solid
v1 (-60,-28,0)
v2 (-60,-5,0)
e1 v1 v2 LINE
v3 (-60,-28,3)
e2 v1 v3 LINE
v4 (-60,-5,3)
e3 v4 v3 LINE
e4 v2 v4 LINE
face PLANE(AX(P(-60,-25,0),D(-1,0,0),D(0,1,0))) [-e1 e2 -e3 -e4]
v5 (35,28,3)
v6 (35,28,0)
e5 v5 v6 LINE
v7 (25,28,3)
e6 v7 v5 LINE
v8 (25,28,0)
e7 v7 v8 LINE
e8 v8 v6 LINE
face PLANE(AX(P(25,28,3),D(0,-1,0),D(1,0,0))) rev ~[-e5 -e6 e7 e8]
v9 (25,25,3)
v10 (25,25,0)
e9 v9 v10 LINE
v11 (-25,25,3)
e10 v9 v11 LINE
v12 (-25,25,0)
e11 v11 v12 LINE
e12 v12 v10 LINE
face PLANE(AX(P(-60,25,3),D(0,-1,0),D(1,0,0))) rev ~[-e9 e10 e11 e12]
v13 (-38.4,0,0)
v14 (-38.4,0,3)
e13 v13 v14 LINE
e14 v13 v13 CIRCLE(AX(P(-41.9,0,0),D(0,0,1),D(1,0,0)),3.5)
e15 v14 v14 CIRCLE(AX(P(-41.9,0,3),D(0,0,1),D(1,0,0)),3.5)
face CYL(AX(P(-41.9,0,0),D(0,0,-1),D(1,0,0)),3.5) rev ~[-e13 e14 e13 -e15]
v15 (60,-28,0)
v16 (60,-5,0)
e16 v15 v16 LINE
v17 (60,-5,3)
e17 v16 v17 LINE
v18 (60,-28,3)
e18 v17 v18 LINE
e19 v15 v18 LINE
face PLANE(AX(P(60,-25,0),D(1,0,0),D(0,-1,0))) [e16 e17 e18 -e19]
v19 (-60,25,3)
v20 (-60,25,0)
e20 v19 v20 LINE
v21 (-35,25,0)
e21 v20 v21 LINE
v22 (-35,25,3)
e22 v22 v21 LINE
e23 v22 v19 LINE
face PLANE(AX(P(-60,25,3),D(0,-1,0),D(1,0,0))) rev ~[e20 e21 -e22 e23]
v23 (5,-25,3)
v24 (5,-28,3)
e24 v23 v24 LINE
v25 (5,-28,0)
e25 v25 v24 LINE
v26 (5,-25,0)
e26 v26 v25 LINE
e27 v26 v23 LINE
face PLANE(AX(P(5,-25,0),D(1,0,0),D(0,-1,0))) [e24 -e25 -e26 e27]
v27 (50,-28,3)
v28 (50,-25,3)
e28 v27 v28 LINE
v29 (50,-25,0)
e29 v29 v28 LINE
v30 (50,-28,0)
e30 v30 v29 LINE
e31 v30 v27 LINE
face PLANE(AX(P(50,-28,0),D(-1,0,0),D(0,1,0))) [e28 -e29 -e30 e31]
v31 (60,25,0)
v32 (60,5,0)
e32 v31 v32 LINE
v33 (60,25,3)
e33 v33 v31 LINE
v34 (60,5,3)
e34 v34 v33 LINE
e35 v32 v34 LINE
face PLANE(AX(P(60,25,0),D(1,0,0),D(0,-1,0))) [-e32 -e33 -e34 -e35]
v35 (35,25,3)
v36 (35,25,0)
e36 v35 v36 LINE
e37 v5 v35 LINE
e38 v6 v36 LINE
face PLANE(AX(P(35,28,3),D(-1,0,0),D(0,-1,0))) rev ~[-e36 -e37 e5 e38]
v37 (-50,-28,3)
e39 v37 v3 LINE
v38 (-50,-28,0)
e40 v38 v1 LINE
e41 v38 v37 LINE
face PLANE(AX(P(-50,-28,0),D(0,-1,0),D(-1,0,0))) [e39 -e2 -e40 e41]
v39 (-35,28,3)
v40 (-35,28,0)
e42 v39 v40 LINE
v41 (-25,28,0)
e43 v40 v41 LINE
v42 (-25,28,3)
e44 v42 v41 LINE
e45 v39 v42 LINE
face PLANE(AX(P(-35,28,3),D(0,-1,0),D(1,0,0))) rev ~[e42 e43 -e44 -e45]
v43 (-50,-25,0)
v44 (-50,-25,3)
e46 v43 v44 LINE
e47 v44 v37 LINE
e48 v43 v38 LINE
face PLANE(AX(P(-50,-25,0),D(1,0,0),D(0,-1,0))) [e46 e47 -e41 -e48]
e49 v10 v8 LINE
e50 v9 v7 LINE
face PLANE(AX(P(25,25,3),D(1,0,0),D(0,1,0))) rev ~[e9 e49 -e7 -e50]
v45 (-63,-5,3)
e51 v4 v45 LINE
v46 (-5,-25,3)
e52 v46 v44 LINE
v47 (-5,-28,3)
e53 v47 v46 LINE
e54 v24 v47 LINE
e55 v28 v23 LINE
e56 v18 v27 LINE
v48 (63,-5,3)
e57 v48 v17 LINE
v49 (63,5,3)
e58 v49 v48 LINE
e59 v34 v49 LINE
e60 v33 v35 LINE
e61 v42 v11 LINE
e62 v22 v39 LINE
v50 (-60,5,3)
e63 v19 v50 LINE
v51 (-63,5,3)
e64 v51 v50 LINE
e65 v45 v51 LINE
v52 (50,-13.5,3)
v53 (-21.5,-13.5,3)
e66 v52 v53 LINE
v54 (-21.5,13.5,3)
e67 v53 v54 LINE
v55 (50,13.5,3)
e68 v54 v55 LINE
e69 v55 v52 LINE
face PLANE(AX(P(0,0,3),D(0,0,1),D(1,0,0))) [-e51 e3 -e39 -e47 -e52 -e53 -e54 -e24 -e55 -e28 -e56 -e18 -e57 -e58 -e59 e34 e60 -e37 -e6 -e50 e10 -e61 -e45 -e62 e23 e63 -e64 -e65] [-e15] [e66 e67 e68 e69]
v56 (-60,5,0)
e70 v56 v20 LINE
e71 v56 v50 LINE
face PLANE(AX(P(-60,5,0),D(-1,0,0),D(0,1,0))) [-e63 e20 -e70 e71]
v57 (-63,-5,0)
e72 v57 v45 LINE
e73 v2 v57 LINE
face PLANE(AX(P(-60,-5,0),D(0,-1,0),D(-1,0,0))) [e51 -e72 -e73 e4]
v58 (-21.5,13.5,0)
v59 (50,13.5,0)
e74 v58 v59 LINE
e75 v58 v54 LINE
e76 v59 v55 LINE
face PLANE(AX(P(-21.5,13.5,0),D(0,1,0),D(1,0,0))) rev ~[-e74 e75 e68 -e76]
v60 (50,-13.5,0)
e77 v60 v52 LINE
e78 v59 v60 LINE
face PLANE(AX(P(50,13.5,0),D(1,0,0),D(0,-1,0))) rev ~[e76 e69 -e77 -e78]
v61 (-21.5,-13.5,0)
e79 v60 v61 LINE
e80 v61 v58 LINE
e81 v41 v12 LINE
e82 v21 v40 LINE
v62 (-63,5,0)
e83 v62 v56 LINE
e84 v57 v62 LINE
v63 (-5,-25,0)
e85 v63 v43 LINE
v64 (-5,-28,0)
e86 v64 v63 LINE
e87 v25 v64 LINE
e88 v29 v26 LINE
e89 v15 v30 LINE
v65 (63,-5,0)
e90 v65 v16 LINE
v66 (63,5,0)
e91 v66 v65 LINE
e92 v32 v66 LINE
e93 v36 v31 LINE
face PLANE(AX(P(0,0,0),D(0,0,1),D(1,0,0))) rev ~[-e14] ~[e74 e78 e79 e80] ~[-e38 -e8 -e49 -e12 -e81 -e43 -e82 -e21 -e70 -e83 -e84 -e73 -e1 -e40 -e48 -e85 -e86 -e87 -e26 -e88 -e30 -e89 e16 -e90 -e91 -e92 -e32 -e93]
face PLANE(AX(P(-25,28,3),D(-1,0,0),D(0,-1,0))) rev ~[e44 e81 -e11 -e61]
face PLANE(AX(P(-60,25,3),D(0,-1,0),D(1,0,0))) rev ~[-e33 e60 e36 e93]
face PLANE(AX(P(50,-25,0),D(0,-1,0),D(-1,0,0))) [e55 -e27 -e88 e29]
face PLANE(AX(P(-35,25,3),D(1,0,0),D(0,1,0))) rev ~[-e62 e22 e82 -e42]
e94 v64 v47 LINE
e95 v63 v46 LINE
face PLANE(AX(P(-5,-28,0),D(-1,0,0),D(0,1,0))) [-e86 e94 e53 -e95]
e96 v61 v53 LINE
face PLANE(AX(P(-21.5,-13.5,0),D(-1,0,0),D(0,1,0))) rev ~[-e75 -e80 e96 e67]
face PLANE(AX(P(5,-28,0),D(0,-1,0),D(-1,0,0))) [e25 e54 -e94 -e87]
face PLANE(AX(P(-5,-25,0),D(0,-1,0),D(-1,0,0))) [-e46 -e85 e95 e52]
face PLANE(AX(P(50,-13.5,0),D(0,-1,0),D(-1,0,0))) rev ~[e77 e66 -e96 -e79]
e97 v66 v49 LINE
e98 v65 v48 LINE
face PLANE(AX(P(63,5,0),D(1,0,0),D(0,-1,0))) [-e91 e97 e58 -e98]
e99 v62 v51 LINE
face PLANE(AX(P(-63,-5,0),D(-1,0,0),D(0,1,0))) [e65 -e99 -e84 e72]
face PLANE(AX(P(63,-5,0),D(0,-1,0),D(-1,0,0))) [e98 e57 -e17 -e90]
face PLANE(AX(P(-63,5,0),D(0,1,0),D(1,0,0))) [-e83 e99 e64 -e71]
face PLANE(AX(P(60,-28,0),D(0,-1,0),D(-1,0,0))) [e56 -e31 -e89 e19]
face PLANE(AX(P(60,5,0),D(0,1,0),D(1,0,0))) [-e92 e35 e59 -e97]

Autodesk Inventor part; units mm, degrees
ref_plane "YZ Plane" through (0, 0, 0) normal (1, 0, 0) x (0, 1, 0)
ref_plane "XZ Plane" through (0, 0, 0) normal (0, 1, 0) x (-1, 0, 0)
ref_plane "XY Plane" through (0, 0, 0) normal (0, 0, 1) x (1, 0, 0)
sketch "Sketch1" plane through (0, 0, 0) normal (0, 0, 1) x (1, 0, 0)
  line L0 (60, -25) -> (-60, -25)
  line L1 (-60, -25) -> (-60, 25)
  line L2 (-60, 25) -> (60, 25)
  line L3 (60, 25) -> (60, -25)
  line L4 (60, -25) -> (-60, 25) construction
  line L5 (-60, -25) -> (60, 25) construction
  line L6 (50, -13.5) -> (-21.5, -13.5)
  line L7 (-21.5, -13.5) -> (-21.5, 13.5)
  line L8 (-21.5, 13.5) -> (50, 13.5)
  line L9 (50, 13.5) -> (50, -13.5)
  line L10 (50, -13.5) -> (-21.5, 13.5) construction
  line L11 (-21.5, -13.5) -> (50, 13.5) construction
  line L12 (-33.5, -13.1) -> (-52.2, -13.1)
  line L13 (-52.2, -13.1) -> (-52.2, 13.1)
  line L14 (-52.2, 13.1) -> (-33.5, 13.1)
  line L15 (-33.5, 13.1) -> (-33.5, -13.1)
  line L16 (-33.5, -13.1) -> (-52.2, 13.1) construction
  line L17 (-52.2, -13.1) -> (-33.5, 13.1) construction
  circle A0 centre (-41.9, 0) radius 3.5
  line L18 (-5, 28) -> (5, 28)
  line L19 (5, 28) -> (5, 25)
  line L20 (5, 25) -> (-5, 25)
  line L21 (-5, 25) -> (-5, 28)
  line L22 (-5, -25) -> (5, -25)
  line L23 (5, -25) -> (5, -28)
  line L24 (5, -28) -> (-5, -28)
  line L25 (-5, -28) -> (-5, -25)
  line L26 (-60, 28) -> (-50, 28)
  line L27 (-50, 28) -> (-50, 25)
  line L28 (-50, 25) -> (-60, 25)
  line L29 (-60, 25) -> (-60, 28)
  line L30 (50, 28) -> (60, 28)
  line L31 (60, 28) -> (60, 25)
  line L32 (60, 25) -> (50, 25)
  line L33 (50, 25) -> (50, 28)
  line L34 (-60, -25) -> (-50, -25)
  line L35 (-50, -25) -> (-50, -28)
  line L36 (-50, -28) -> (-60, -28)
  line L37 (-60, -28) -> (-60, -25)
  line L38 (50, -25) -> (60, -25)
  line L39 (60, -25) -> (60, -28)
  line L40 (60, -28) -> (50, -28)
  line L41 (50, -28) -> (50, -25)
  line L42 (-63, 5) -> (-60, 5)
  line L43 (-60, 5) -> (-60, -5)
  line L44 (-60, -5) -> (-63, -5)
  line L45 (-63, -5) -> (-63, 5)
  line L46 (63, -5) -> (60, -5)
  line L47 (60, -5) -> (60, 5)
  line L48 (60, 5) -> (63, 5)
  line L49 (63, 5) -> (63, -5)
  point P0 (0, 0)
  point P1 (14.25, 0)
  point P2 (-42.85, 0)
  point P3 (0, 25)
  point P4 (0, -25)
  point P5 (-60, 0)
  point P6 (60, 0)
  dimension "d0" = 120
  dimension "d1" = 50
  dimension "d2" = 27
  dimension "d3" = 71.5
  dimension "d4" = 10
  dimension "d6" = 18.7
  dimension "d7" = 26.2
  dimension "d8" = 7
  dimension "d9" = 8.4
  dimension "d10" = 12
  dimension "d11" = 10
  dimension "d12" = 3
  dimension "d13" = 10
  dimension "d14" = 3
  dimension "d15" = 10
  dimension "d16" = 3
  dimension "d17" = 10
  dimension "d18" = 3
  dimension "d19" = 10
  dimension "d20" = 3
  dimension "d21" = 10
  dimension "d22" = 3
  dimension "d23" = 3
  dimension "d24" = 10
  dimension "d25" = 3
  dimension "d26" = 10
extrude "Extrusion1" add sketch "Sketch1" along normal blind 3 contours L39 L40 L41 L0 | L0 L1 L2 L3 | L3 L48 L49 L46 | L23 L24 L25 L0 | L2 L33 L30 L31 | L35 L36 L37 L0 | L2 L21 L18 L19 | L44 L45 L42 L1 | L2 L29 L26 L27 | L12 L13 L14 L15
sketch "Sketch2" plane through (0, 0, 3) normal (0, 0, 1) x (1, 0, 0)
  line L0 (-60, 28) -> (-60, 5) projected
  line L1 (-50, 28) -> (-60, 28) projected
  line L2 (-50, 25) -> (-50, 28) projected
  line L3 (-5, 25) -> (-50, 25) projected
  line L4 (60, 5) -> (60, 28) projected
  line L5 (60, 28) -> (50, 28) projected
  line L6 (50, 28) -> (50, 25) projected
  line L7 (50, 25) -> (5, 25) projected
  line L8 (5, 25) -> (5, 28) projected
  line L9 (5, 28) -> (-5, 28) projected
  line L10 (-5, 28) -> (-5, 25) projected
  line L11 (-60, 25) -> (60, 25)
  point P0 (0, 0)
extrude "Extrusion2" cut sketch "Sketch2" against normal through all
sketch "Sketch3" plane through (0, 0, 3) normal (0, 0, 1) x (1, 0, 0)
  line L0 (60, 25) -> (-60, 25) projected
  line L1 (-35, 28) -> (-25, 28)
  line L2 (-25, 28) -> (-25, 25)
  line L3 (-25, 25) -> (-35, 25)
  line L4 (-35, 25) -> (-35, 28)
  line L5 (25, 28) -> (35, 28)
  line L6 (35, 28) -> (35, 25)
  line L7 (35, 25) -> (25, 25)
  line L8 (25, 25) -> (25, 28)
  point P0 (0, 0)
  point P1 (-30, 25)
  point P2 (0, 25)
  point P3 (-30, 28)
  point P4 (30, 25)
  dimension "d31" = 120
  dimension "d32" = 10
  dimension "d33" = 3
  dimension "d34" = 10
  dimension "d35" = 3
  dimension "d36" = 30
  dimension "d37" = 30
extrude "Extrusion3" add sketch "Sketch3" against normal blind 3
sketch "Sketch4" plane through (0, 0, 3) normal (0, 0, 1) x (1, 0, 0)
  circle A0 centre (-41.9, 0) radius 3.5 projected
  line L0 (50, -13.5) -> (50, 13.5) projected
  line L1 (50, 13.5) -> (-21.5, 13.5) projected
  line L2 (-21.5, 13.5) -> (-21.5, -13.5) projected
  line L3 (-21.5, -13.5) -> (50, -13.5) projected
  line L4 (60, 5) -> (63, 5) projected
  line L5 (63, 5) -> (63, -5) projected
  line L6 (63, -5) -> (60, -5) projected
  line L7 (60, -5) -> (60, -28) projected
  line L8 (60, -28) -> (50, -28) projected
  line L9 (50, -28) -> (50, -25) projected
  line L10 (50, -25) -> (5, -25) projected
  line L11 (5, -25) -> (5, -28) projected
  line L12 (5, -28) -> (-5, -28) projected
  line L13 (-5, -28) -> (-5, -25) projected
  line L14 (-5, -25) -> (-50, -25) projected
  line L15 (-50, -25) -> (-50, -28) projected
  line L16 (-50, -28) -> (-60, -28) projected
  line L17 (-60, -28) -> (-60, -5) projected
  line L18 (-60, -5) -> (-63, -5) projected
  line L19 (-63, -5) -> (-63, 5) projected
  line L20 (-63, 5) -> (-60, 5) projected
  line L21 (-60, 5) -> (-60, 25) projected
  line L22 (-60, 25) -> (-35, 25) projected
  line L23 (-35, 25) -> (-35, 28) projected
  line L24 (-35, 28) -> (-25, 28) projected
  line L25 (-25, 28) -> (-25, 25) projected
  line L26 (-25, 25) -> (25, 25) projected
  line L27 (25, 25) -> (25, 28) projected
  line L28 (25, 28) -> (35, 28) projected
  line L29 (35, 28) -> (35, 25) projected
  line L30 (35, 25) -> (60, 25) projected
  line L31 (60, 25) -> (60, 5) projected
  point P0 (0, 0)
equation "\"d36\" = 0.25 * d31"
equation "\"d37\" = d36"
properties part number "Front-panel"
